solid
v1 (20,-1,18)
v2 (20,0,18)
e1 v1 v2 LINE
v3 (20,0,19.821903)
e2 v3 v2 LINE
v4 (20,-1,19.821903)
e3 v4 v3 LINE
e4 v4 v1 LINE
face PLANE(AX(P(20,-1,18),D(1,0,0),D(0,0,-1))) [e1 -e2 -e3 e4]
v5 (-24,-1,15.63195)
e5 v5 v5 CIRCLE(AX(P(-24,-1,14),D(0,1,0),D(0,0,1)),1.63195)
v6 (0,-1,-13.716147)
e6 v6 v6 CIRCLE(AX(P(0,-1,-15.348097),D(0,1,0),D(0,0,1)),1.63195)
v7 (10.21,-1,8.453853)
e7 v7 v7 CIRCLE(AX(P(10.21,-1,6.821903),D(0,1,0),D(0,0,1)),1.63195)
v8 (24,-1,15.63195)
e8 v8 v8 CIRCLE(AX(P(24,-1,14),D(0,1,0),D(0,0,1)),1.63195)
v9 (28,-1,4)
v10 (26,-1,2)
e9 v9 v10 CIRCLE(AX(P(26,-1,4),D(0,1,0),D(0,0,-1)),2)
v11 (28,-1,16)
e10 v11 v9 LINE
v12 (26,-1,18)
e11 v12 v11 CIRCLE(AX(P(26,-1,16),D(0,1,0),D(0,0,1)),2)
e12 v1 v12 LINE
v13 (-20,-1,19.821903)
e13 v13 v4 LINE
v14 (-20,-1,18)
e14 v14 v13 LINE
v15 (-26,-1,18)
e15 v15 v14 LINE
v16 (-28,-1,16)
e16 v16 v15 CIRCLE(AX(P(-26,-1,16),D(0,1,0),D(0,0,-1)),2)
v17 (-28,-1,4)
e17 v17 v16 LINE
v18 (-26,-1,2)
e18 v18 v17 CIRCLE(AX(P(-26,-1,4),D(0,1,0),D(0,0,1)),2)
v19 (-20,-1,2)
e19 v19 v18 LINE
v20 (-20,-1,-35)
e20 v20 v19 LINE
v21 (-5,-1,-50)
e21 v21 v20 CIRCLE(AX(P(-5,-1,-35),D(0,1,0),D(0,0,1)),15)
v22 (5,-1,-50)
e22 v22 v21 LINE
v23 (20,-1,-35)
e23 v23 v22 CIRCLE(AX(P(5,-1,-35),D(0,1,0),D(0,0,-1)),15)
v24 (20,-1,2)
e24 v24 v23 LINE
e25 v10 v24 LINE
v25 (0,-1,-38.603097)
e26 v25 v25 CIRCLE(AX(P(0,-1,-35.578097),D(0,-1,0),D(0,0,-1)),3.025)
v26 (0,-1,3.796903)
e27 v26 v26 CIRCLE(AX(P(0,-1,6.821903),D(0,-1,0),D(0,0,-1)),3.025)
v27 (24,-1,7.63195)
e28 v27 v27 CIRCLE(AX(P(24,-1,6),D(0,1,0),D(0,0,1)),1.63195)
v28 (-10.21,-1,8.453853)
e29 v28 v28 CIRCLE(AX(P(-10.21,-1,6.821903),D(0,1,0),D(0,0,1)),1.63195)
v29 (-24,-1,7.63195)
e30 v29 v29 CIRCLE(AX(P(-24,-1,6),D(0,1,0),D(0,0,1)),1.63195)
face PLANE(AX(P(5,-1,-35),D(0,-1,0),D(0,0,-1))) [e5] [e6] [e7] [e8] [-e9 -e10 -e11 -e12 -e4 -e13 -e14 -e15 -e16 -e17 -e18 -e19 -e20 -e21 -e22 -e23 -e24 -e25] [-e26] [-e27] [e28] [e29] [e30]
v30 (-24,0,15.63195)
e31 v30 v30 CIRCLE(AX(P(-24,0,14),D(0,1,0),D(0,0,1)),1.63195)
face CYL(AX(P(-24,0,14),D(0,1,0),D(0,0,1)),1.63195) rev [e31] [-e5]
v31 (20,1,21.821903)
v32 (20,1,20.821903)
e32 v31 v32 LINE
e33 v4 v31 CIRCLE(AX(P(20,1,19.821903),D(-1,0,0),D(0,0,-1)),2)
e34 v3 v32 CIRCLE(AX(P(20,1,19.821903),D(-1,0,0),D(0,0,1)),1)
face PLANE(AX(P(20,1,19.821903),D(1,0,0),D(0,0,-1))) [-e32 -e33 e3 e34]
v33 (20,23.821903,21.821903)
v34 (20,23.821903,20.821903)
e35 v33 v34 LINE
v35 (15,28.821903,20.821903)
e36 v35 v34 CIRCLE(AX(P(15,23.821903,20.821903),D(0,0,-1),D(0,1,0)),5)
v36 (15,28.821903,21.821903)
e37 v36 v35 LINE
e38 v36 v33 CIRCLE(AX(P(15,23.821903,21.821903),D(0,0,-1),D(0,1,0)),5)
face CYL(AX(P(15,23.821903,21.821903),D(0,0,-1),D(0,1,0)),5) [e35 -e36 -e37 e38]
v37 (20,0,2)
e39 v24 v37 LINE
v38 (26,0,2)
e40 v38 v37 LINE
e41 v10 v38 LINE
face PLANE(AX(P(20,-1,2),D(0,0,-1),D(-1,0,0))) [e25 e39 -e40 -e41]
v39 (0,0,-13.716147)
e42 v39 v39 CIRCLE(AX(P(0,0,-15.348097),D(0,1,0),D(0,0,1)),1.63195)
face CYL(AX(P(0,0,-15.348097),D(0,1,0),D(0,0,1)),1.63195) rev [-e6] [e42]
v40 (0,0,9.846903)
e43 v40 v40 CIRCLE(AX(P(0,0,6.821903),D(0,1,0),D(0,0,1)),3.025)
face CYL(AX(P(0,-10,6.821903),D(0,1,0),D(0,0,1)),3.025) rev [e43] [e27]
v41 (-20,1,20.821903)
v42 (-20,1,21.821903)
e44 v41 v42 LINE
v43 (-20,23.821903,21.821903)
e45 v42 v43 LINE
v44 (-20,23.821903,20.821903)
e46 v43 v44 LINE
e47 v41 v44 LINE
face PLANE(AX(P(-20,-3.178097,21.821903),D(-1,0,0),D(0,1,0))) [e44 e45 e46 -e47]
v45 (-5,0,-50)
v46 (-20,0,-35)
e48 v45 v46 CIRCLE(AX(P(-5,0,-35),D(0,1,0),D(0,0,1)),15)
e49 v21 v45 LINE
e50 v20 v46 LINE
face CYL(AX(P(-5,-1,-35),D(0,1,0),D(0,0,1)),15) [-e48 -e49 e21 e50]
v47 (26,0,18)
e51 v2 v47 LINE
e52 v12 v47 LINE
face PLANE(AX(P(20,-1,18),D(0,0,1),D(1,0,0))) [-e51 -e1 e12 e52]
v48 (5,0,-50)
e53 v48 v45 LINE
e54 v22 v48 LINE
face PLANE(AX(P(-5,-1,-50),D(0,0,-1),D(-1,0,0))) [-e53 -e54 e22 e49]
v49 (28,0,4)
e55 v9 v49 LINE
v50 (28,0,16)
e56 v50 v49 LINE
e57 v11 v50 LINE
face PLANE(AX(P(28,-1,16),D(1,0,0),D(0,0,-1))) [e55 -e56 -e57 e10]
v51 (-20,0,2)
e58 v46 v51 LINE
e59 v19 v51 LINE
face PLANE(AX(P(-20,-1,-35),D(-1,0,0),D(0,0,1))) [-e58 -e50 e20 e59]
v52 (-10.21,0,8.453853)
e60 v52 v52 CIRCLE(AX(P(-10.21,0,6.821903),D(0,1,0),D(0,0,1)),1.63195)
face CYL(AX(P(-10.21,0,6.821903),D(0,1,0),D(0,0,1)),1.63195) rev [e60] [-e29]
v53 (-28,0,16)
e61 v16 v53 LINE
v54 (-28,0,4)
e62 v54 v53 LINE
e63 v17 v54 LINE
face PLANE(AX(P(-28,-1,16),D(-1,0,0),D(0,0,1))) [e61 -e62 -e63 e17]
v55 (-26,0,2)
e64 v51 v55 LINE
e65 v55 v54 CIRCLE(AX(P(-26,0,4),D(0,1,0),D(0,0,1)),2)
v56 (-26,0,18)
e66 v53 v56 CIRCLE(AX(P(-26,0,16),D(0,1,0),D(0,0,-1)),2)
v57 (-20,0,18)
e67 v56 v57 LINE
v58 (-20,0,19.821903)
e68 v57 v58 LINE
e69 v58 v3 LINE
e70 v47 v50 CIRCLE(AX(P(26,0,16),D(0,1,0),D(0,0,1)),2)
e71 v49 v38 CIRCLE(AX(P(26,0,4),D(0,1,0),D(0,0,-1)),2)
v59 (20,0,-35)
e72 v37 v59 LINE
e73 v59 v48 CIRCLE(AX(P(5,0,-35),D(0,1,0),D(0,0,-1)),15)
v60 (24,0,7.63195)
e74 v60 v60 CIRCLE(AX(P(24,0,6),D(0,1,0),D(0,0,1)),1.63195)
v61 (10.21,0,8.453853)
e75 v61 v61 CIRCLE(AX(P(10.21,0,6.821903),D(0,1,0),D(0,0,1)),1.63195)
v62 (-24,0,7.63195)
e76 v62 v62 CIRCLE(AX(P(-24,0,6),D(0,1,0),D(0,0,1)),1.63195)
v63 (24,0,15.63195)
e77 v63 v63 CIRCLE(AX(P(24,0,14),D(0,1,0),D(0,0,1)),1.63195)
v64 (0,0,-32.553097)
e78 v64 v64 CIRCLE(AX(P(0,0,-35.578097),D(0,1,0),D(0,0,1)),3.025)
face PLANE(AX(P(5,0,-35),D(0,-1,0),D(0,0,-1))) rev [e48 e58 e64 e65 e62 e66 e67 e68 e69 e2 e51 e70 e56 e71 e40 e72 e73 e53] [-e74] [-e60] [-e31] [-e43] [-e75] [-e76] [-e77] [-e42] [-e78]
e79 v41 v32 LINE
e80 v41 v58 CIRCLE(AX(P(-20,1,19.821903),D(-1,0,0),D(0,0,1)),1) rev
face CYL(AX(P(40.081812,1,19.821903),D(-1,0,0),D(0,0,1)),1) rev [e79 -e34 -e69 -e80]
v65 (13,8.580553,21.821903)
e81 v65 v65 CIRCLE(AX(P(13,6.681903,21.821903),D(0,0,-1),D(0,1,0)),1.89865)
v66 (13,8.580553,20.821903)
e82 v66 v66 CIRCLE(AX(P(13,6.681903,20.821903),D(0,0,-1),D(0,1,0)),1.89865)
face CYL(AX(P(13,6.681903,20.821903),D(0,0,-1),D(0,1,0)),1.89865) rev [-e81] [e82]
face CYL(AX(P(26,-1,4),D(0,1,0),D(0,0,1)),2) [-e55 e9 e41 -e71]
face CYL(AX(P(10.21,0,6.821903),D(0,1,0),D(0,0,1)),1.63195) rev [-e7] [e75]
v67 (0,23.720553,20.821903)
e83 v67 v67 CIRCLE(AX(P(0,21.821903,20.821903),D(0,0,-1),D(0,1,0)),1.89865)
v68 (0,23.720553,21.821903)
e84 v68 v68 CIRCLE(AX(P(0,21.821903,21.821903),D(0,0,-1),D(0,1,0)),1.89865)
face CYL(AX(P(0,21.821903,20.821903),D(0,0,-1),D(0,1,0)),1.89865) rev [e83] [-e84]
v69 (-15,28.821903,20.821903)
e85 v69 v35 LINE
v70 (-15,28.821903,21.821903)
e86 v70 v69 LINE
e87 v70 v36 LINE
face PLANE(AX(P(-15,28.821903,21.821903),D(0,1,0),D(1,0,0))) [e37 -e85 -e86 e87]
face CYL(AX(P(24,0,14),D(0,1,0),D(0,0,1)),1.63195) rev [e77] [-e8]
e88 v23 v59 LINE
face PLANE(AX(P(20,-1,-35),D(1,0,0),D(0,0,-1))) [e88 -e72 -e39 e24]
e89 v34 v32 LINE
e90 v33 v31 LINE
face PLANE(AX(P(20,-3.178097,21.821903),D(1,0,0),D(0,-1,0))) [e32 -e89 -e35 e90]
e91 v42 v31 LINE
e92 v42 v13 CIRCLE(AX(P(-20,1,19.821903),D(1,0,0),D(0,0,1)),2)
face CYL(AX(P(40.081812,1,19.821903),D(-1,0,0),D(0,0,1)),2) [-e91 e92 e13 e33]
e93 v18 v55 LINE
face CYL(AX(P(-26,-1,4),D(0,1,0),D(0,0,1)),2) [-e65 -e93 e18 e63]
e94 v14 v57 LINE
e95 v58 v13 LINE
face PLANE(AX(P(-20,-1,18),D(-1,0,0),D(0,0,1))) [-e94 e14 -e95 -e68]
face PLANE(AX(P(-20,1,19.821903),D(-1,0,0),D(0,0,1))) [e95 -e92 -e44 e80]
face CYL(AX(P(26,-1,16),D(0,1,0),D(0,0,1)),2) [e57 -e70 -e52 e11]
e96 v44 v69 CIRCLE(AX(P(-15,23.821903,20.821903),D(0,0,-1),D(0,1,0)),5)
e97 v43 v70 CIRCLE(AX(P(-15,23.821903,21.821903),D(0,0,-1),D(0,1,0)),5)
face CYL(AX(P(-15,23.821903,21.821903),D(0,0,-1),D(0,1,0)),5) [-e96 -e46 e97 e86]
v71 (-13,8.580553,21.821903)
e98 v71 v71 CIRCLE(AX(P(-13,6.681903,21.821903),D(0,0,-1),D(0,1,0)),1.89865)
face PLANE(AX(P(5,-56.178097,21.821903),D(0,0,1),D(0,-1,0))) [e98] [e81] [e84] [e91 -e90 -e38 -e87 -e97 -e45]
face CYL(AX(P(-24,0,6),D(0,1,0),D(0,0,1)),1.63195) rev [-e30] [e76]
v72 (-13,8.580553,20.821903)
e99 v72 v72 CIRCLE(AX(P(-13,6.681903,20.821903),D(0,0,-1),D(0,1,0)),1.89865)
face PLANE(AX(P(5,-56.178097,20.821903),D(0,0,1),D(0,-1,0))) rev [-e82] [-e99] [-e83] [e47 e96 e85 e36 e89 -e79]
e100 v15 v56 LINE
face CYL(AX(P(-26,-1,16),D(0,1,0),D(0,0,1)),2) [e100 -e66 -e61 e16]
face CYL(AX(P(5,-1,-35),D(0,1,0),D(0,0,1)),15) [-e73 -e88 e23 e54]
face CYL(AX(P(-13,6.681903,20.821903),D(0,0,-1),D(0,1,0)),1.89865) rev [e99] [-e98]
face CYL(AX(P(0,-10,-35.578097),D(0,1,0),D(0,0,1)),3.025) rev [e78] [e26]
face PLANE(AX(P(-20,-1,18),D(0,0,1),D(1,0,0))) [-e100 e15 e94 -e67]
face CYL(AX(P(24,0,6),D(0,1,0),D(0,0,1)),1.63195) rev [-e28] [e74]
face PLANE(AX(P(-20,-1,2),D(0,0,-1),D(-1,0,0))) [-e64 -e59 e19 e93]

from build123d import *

# Parameters (mm, degrees)
BASE_FLANGE1_DEPTH       = 1
SKETCHED_START           = 21.616422755
SKETCHED_BEND1_OUTLINE_W = 40
SKETCHED_BEND1_OUTLINE_H = 1
SKETCHED_BEND1_DEPTH     = 28.383577245
SKETCHED_START_2         = 20.821902755
SKETCHED_BEND1_2_DEPTH   = 0.00548
SKETCHED_START_3         = 19.821902755
SKETCHED_BEND1_3_DEPTH   = 2
SKETCHED_START_4         = -20
SKETCHED_BEND1_4_DEPTH   = 40
SKETCH7_R                = 3.025
CUT_EXTRUDE1_DEPTH       = 10
F_4_CLEARANCE_HOLE1_D    = 3.2639
F_6_CLEARANCE_HOLE1_D    = 3.7973
F_4_CLEARANCE_HOLE2_D    = 3.2639


with BuildPart() as part:
    # Base-Flange1: sheet metal written as solids
    # Sketch1 → Base-Flange1 (new body)
    with BuildSketch(Plane(origin=(0, 0, 0), x_dir=(1, 0, 0), z_dir=(0, 1, 0))):
        with BuildLine():
            Line((-20, -18), (-20, -45))
            ThreePointArc((-20, -45), (-18.535533906, -48.535533906), (-15, -50))
            Line((-15, -50), (15, -50))
            ThreePointArc((15, -50), (18.535533906, -48.535533906), (20, -45))
            Line((20, -45), (20, -18))
            Line((20, -18), (26, -18))
            ThreePointArc((26, -18), (27.414213562, -17.414213562), (28, -16))
            Line((28, -16), (28, -4))
            ThreePointArc((28, -4), (27.414213562, -2.585786438), (26, -2))
            Line((26, -2), (20, -2))
            Line((20, -2), (20, 35))
            ThreePointArc((20, 35), (15.606601718, 45.606601718), (5, 50))
            Line((5, 50), (-5, 50))
            ThreePointArc((-5, 50), (-15.606601718, 45.606601718), (-20, 35))
            Line((-20, 35), (-20, -2))
            Line((-20, -2), (-26, -2))
            ThreePointArc((-26, -2), (-27.414213562, -2.585786438), (-28, -4))
            Line((-28, -4), (-28, -16))
            ThreePointArc((-28, -16), (-27.414213562, -17.414213562), (-26, -18))
            Line((-26, -18), (-20, -18))
        make_face()
    extrude(amount=-BASE_FLANGE1_DEPTH)

    # Sketched Bend1: read off the stored shape, not the designer's step
    # Sketched Bend1 outline → Sketched Bend1 (cut)
    with BuildSketch(Plane.XY.offset(SKETCHED_START)):
        with Locations((0, -0.5)):
            Rectangle(SKETCHED_BEND1_OUTLINE_W, SKETCHED_BEND1_OUTLINE_H)
    extrude(amount=SKETCHED_BEND1_DEPTH, mode=Mode.SUBTRACT)

    # Sketched Bend1 2 outline → Sketched Bend1 2 (add)
    with BuildSketch(Plane.XY.offset(SKETCHED_START_2)):
        with BuildLine():
            Line((20, 0), (20, 23.821902755))
            ThreePointArc((20, 23.821902755), (18.535533906, 27.357436661), (15, 28.821902755))
            Line((15, 28.821902755), (-15, 28.821902755))
            ThreePointArc((-15, 28.821902755), (-18.535533906, 27.357436661), (-20, 23.821902755))
            Line((-20, 23.821902755), (-20, 0))
            Line((-20, 0), (20, 0))
        make_face()
    extrude(amount=SKETCHED_BEND1_2_DEPTH)

    # Sketched Bend1 3 outline → Sketched Bend1 3 (add)
    with BuildSketch(Plane.XY.offset(SKETCHED_START_3)):
        with BuildLine():
            Line((20, 0), (20, 23.821902755))
            ThreePointArc((20, 23.821902755), (18.535533906, 27.357436661), (15, 28.821902755))
            Line((15, 28.821902755), (-15, 28.821902755))
            ThreePointArc((-15, 28.821902755), (-18.535533906, 27.357436661), (-20, 23.821902755))
            Line((-20, 23.821902755), (-20, 0))
            Line((-20, 0), (20, 0))
        make_face()
    extrude(amount=SKETCHED_BEND1_3_DEPTH)

    # Sketched Bend1 4 outline → Sketched Bend1 4 (cut)
    with BuildSketch(Plane.YZ.offset(SKETCHED_START_4)):
        with BuildLine():
            Line((28.821902755, 19.821902755), (28.821902755, 20.821902755))
            Line((28.821902755, 20.821902755), (1, 20.821902755))
            ThreePointArc((1, 20.821902755), (0.292893219, 20.529009536), (0, 19.821902755))
            Line((0, 19.821902755), (28.821902755, 19.821902755))
        make_face()
        with BuildLine():
            ThreePointArc((-1, 19.821902755), (-0.414213562, 21.236116317), (1, 21.821902755))
            Line((1, 21.821902755), (0, 21.821902755))
            Line((0, 21.821902755), (0, 21.616422755))
            Line((0, 21.616422755), (-1, 21.616422755))
            Line((-1, 21.616422755), (-1, 19.821902755))
        make_face()
    extrude(amount=SKETCHED_BEND1_4_DEPTH, mode=Mode.SUBTRACT)

    # Sketch7 → Cut-Extrude1 (cut)
    with BuildSketch(Plane(origin=(0, 0, 0), x_dir=(1, 0, 0), z_dir=(0, 1, 0))):
        with Locations(Location((0, -6.821902755, 0), (0, 0, 270))):
            Circle(SKETCH7_R)
        with Locations(Location((0, 35.578097245, 0), (0, 0, 270))):
            Circle(SKETCH7_R)
    extrude(amount=-CUT_EXTRUDE1_DEPTH, mode=Mode.SUBTRACT)

    # #4 Clearance Hole1 (through all)
    with Locations(Plane(origin=(0, 0, 0), x_dir=(1, 0, 0), z_dir=(0, 1, 0))):
        with Locations((0, 15.348097245), (-10.21, -6.821902755), (10.21, -6.821902755)):
            Hole(F_4_CLEARANCE_HOLE1_D / 2)

    # #6 Clearance Hole1 (through all)
    with Locations(Plane(origin=(0, 0, 20.821902755), x_dir=(-1, 0, 0), z_dir=(0, 0, -1))):
        with Locations((13, 6.681902755), (-13, 6.681902755), (0, 21.821902755)):
            Hole(F_6_CLEARANCE_HOLE1_D / 2)

    # #4 Clearance Hole2 (through all)
    with Locations(Plane(origin=(0, 0, 0), x_dir=(1, 0, 0), z_dir=(0, 1, 0))):
        with Locations((-24, -6), (-24, -14), (24, -6), (24, -14)):
            Hole(F_4_CLEARANCE_HOLE2_D / 2)


solid = part.part
